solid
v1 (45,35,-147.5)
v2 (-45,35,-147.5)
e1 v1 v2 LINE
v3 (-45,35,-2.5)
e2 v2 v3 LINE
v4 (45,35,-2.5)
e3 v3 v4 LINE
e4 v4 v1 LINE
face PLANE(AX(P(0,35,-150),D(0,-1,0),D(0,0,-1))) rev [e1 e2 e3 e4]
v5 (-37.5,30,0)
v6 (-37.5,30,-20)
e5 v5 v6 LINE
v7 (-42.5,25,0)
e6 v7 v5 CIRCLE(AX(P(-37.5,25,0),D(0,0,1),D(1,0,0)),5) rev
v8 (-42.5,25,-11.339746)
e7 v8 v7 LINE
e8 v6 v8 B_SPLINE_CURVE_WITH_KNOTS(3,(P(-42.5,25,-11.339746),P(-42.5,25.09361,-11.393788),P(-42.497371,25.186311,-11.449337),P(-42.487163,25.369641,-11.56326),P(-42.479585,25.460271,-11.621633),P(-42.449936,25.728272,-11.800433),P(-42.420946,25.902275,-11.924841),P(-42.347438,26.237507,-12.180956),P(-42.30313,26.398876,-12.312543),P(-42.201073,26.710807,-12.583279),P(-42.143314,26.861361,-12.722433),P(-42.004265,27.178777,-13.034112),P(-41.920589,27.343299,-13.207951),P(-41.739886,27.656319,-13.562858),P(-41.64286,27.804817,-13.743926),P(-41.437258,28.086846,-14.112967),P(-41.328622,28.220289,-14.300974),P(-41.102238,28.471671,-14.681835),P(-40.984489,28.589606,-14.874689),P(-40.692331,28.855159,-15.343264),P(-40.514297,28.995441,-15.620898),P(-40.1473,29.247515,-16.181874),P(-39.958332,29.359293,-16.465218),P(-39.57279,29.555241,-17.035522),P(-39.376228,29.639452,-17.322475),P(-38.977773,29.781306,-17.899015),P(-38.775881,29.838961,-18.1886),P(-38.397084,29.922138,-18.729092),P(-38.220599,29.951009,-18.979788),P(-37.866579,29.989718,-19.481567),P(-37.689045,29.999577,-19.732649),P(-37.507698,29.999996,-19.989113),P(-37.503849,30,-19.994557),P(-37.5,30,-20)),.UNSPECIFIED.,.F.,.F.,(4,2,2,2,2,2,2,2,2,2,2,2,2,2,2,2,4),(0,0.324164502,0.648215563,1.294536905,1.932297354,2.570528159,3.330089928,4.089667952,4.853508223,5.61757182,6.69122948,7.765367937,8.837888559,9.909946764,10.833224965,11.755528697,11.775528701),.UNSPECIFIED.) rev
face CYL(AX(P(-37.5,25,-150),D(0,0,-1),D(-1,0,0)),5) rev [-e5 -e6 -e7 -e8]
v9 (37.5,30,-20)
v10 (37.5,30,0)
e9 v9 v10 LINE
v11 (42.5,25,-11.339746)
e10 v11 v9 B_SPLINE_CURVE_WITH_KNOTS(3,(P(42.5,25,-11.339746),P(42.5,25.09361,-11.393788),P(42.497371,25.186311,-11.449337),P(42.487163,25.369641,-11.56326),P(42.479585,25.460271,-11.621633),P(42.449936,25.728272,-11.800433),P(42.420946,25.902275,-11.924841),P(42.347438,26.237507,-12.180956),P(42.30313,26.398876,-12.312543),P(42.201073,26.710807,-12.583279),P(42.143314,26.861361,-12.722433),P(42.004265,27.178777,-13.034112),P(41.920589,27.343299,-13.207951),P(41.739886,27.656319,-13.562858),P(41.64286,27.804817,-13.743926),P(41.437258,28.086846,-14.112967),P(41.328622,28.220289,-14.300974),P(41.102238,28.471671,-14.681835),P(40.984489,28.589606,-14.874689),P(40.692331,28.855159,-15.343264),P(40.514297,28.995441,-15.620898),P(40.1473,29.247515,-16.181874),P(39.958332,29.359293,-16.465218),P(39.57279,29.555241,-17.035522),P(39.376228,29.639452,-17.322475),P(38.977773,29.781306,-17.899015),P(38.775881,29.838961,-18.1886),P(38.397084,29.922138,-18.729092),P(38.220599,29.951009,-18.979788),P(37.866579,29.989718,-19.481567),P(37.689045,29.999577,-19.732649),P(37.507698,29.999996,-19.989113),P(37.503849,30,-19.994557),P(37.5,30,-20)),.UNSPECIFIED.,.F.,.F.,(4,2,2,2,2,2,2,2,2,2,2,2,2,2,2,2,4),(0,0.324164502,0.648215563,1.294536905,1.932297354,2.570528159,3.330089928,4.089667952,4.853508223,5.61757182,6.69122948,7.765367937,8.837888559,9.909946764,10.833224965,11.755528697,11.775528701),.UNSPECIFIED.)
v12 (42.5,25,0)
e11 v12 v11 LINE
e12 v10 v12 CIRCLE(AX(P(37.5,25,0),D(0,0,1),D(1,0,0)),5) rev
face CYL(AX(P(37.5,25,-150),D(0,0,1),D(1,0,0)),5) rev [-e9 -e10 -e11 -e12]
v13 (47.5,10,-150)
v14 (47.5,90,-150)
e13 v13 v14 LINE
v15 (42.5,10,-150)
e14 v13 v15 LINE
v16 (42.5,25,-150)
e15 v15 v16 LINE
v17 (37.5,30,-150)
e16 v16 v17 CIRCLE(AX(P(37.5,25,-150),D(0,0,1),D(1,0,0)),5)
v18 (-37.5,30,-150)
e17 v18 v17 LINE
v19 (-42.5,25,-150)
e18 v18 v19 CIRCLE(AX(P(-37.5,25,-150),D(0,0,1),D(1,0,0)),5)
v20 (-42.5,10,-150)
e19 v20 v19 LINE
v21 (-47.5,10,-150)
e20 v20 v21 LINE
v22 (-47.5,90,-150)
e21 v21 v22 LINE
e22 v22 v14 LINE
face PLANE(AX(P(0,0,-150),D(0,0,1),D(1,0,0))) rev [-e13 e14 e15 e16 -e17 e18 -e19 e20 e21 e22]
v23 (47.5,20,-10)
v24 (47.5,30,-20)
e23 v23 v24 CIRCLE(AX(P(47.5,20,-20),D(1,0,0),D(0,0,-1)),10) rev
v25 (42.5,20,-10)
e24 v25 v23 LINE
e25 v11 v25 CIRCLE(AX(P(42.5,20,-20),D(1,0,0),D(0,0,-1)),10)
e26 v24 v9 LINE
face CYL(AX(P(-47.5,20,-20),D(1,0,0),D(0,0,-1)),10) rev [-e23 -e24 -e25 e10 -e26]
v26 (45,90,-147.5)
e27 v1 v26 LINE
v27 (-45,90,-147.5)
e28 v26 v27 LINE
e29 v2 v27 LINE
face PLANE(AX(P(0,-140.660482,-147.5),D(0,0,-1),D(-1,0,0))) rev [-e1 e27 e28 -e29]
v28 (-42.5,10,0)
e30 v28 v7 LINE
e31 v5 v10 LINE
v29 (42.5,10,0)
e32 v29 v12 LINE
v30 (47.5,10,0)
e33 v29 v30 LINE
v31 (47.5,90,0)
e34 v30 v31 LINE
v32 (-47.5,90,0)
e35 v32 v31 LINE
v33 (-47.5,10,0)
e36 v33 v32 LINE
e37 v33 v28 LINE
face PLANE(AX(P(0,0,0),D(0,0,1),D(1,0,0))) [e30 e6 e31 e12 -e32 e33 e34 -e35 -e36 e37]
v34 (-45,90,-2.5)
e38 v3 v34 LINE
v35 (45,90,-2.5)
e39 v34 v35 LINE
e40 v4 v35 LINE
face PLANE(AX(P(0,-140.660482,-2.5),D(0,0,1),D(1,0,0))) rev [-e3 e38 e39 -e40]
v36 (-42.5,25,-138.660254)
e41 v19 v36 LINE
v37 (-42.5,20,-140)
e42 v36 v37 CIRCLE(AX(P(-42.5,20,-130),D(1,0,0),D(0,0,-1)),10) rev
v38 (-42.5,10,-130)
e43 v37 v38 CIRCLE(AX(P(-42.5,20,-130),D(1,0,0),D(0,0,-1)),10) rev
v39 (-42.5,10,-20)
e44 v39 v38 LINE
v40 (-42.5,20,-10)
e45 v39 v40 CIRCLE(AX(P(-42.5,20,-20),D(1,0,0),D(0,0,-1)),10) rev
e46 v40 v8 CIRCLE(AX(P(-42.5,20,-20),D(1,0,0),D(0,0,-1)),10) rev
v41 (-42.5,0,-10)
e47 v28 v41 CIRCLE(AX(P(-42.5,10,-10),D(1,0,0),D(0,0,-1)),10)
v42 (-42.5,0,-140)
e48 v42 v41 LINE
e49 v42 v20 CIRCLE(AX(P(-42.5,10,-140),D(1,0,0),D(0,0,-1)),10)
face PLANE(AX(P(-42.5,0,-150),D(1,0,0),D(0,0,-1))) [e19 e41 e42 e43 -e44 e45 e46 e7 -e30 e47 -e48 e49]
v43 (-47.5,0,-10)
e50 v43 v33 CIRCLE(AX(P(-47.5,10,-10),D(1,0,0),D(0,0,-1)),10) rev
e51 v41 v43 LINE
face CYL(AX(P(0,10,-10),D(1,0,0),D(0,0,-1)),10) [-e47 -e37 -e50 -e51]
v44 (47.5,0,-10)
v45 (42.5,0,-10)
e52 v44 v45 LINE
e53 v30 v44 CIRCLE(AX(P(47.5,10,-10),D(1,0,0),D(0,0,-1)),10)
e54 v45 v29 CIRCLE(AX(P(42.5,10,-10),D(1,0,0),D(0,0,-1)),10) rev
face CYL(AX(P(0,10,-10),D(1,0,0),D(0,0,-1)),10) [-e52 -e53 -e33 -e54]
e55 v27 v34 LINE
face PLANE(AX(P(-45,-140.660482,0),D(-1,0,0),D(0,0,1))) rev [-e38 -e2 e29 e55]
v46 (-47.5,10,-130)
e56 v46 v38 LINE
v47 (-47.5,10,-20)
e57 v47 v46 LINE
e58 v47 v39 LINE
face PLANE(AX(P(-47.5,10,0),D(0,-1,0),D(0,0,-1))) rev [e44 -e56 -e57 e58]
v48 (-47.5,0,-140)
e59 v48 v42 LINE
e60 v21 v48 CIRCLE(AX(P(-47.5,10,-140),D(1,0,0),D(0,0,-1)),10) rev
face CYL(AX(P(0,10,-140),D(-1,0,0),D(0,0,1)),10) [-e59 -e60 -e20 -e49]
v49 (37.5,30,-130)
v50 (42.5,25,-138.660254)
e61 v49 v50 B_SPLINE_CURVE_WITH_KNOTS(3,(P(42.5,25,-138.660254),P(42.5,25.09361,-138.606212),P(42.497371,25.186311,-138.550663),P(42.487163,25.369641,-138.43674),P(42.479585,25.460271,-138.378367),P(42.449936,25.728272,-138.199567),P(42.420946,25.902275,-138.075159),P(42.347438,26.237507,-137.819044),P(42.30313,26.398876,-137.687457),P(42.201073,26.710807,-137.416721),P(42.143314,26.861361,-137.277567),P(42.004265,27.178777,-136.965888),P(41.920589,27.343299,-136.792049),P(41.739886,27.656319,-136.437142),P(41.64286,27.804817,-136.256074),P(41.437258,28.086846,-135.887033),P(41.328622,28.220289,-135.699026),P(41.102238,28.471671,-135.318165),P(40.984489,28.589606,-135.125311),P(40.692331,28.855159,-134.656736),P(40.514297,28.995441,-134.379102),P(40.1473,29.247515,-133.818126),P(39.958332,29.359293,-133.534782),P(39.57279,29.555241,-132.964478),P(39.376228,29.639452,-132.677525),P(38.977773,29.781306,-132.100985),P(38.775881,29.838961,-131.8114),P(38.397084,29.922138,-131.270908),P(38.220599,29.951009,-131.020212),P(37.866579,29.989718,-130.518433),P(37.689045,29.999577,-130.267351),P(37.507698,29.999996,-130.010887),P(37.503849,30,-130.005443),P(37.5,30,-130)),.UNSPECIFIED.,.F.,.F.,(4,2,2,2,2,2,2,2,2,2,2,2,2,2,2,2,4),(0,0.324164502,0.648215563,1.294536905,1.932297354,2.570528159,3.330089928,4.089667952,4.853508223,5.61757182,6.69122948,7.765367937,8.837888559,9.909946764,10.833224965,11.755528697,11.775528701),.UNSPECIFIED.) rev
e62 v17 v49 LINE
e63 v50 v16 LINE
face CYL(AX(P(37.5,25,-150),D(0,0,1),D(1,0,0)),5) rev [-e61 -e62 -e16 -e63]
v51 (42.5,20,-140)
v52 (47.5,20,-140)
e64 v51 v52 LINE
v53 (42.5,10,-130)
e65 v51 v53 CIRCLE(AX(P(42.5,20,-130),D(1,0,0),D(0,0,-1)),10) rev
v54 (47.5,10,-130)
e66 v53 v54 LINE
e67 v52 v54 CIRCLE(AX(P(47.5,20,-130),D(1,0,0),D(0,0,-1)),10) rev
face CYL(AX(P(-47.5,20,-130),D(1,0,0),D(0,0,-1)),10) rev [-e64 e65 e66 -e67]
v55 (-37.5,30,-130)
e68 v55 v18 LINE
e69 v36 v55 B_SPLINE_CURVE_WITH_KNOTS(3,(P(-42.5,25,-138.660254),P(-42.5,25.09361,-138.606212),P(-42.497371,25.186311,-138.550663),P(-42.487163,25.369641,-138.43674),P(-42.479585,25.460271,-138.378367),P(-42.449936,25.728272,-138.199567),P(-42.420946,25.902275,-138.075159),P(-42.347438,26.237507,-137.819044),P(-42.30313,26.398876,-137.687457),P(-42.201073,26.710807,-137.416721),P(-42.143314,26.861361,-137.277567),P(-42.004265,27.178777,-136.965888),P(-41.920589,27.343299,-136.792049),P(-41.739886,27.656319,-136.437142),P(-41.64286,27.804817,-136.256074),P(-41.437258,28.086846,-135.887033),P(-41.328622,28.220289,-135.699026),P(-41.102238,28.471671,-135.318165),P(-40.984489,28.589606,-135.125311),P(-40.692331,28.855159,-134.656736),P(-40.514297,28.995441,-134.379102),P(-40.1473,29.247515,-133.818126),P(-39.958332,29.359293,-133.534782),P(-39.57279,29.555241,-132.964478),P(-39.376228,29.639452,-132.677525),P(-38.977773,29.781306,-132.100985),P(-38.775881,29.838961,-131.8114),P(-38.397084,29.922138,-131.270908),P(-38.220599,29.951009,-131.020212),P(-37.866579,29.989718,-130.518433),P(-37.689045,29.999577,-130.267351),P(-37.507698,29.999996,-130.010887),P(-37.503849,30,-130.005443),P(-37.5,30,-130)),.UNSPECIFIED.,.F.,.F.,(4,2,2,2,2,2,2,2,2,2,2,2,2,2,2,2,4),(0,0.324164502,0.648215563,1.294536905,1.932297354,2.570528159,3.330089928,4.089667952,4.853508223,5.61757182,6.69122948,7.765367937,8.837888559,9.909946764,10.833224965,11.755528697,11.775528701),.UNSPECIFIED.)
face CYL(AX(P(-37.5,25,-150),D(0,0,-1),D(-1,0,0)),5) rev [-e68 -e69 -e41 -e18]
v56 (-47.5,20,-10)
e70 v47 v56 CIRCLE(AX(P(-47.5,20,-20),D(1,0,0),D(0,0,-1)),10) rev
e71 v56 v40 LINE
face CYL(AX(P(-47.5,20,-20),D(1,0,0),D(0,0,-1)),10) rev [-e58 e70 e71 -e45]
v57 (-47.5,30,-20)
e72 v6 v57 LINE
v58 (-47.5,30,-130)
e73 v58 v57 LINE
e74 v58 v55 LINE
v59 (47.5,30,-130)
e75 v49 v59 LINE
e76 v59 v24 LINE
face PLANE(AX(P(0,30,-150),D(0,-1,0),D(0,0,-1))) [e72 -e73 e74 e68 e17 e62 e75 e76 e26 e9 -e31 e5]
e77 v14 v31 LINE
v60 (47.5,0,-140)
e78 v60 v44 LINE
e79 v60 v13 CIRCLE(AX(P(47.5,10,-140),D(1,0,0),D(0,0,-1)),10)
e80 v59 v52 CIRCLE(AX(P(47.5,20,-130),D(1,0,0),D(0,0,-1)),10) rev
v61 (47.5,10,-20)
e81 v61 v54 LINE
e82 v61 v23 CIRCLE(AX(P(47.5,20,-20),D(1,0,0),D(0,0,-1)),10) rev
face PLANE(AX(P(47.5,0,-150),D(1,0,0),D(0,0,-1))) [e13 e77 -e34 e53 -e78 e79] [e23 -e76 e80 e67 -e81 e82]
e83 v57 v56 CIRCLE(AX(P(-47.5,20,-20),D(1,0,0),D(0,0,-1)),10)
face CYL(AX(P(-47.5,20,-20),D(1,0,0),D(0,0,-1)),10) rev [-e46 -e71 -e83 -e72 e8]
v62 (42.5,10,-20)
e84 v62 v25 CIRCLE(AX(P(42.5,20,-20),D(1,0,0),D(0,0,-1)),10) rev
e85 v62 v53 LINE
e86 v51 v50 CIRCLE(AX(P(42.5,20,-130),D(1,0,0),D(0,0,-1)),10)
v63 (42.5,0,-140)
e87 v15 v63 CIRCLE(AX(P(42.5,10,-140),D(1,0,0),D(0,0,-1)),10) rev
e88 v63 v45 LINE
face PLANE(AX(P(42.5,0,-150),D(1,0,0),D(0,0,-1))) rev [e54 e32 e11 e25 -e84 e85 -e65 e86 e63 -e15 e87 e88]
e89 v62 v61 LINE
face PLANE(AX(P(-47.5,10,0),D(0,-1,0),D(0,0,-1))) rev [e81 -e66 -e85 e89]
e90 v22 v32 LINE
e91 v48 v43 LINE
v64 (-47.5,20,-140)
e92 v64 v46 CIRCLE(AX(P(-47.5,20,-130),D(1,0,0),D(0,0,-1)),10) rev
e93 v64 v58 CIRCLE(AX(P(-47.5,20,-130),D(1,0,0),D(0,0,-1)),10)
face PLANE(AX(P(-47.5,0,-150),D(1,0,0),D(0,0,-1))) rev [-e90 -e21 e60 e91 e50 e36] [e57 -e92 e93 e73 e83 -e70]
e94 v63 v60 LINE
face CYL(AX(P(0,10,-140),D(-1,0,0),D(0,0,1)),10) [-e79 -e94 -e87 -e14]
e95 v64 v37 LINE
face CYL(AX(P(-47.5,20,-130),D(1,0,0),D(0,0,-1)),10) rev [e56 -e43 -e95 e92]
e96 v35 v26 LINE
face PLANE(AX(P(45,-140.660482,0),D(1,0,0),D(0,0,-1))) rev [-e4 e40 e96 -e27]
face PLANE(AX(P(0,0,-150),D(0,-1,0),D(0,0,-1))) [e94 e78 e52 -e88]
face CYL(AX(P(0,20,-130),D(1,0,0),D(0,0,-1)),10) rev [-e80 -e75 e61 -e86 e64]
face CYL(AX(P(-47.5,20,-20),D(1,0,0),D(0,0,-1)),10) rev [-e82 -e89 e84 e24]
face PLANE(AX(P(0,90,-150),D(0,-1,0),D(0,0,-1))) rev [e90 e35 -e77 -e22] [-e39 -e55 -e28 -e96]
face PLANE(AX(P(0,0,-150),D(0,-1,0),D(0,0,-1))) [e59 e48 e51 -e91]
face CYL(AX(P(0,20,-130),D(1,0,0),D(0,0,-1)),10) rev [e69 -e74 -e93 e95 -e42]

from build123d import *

# Parameters (mm, degrees)
BOSS_EXTRUDE1_DEPTH = 150
FILLET1_R           = 10
CUT_EXTRUDE1_DEPTH  = 200.060292374
FILLET2_R           = 10
SKETCH3_W           = 90
SKETCH3_H           = 145
CUT_EXTRUDE2_DEPTH  = 55
FILLET3_R           = 5


with BuildPart() as part:
    # Sketch1 → Boss-Extrude1 (new body)
    with BuildSketch(Plane.XY):
        Polygon((-47.5, 90), (-47.5, 0), (-42.5, 0), (-42.5, 30), (42.5, 30), (42.5, 0), (47.5, 0), (47.5, 90), align=None)
    extrude(amount=-BOSS_EXTRUDE1_DEPTH)

    # Fillet1
    fillet1_edges = [part.edges().sort_by_distance(p)[0] for p in [
        (-45, 0, 0),
        (45, 0, -150),
        (45, 0, 0),
        (-45, 0, -150),
    ]]
    fillet(fillet1_edges, radius=FILLET1_R)

    # Sketch2 → Cut-Extrude1 (cut, through all)
    with BuildSketch(Plane(origin=(47.5, 0, 0), x_dir=(0, 0, -1), z_dir=(1, 0, 0))):
        with BuildLine():
            Line((140, 20), (140, 30))
            Line((140, 30), (10, 30))
            Line((10, 30), (10, 20))
            ThreePointArc((10, 20), (12.928932188, 12.928932188), (20, 10))
            Line((20, 10), (130, 10))
            ThreePointArc((130, 10), (137.071067812, 12.928932188), (140, 20))
        make_face()
    extrude(amount=-CUT_EXTRUDE1_DEPTH, mode=Mode.SUBTRACT)

    # Fillet2
    fillet2_edges = [part.edges().sort_by_distance(p)[0] for p in [
        (-45, 30, -140),
        (-45, 30, -10),
        (45, 30, -140),
        (45, 30, -10),
    ]]
    fillet(fillet2_edges, radius=FILLET2_R - 0.0001)  # a hair under: the kernel refuses the full size

    # Sketch3 → Cut-Extrude2 (cut)
    with BuildSketch(Plane(origin=(0, 90, 0), x_dir=(1, 0, 0), z_dir=(0, 1, 0))):
        with Locations((0, 75)):
            Rectangle(SKETCH3_W, SKETCH3_H)
    extrude(amount=-CUT_EXTRUDE2_DEPTH, mode=Mode.SUBTRACT)

    # Fillet3
    fillet3_edges = [part.edges().sort_by_distance(p)[0] for p in [
        (42.5, 30, -140.00005),
        (-42.5, 30, -140.00005),
        (-42.5, 30, -9.99995),
        (42.5, 30, -9.99995),
    ]]
    fillet(fillet3_edges, radius=FILLET3_R)


solid = part.part
